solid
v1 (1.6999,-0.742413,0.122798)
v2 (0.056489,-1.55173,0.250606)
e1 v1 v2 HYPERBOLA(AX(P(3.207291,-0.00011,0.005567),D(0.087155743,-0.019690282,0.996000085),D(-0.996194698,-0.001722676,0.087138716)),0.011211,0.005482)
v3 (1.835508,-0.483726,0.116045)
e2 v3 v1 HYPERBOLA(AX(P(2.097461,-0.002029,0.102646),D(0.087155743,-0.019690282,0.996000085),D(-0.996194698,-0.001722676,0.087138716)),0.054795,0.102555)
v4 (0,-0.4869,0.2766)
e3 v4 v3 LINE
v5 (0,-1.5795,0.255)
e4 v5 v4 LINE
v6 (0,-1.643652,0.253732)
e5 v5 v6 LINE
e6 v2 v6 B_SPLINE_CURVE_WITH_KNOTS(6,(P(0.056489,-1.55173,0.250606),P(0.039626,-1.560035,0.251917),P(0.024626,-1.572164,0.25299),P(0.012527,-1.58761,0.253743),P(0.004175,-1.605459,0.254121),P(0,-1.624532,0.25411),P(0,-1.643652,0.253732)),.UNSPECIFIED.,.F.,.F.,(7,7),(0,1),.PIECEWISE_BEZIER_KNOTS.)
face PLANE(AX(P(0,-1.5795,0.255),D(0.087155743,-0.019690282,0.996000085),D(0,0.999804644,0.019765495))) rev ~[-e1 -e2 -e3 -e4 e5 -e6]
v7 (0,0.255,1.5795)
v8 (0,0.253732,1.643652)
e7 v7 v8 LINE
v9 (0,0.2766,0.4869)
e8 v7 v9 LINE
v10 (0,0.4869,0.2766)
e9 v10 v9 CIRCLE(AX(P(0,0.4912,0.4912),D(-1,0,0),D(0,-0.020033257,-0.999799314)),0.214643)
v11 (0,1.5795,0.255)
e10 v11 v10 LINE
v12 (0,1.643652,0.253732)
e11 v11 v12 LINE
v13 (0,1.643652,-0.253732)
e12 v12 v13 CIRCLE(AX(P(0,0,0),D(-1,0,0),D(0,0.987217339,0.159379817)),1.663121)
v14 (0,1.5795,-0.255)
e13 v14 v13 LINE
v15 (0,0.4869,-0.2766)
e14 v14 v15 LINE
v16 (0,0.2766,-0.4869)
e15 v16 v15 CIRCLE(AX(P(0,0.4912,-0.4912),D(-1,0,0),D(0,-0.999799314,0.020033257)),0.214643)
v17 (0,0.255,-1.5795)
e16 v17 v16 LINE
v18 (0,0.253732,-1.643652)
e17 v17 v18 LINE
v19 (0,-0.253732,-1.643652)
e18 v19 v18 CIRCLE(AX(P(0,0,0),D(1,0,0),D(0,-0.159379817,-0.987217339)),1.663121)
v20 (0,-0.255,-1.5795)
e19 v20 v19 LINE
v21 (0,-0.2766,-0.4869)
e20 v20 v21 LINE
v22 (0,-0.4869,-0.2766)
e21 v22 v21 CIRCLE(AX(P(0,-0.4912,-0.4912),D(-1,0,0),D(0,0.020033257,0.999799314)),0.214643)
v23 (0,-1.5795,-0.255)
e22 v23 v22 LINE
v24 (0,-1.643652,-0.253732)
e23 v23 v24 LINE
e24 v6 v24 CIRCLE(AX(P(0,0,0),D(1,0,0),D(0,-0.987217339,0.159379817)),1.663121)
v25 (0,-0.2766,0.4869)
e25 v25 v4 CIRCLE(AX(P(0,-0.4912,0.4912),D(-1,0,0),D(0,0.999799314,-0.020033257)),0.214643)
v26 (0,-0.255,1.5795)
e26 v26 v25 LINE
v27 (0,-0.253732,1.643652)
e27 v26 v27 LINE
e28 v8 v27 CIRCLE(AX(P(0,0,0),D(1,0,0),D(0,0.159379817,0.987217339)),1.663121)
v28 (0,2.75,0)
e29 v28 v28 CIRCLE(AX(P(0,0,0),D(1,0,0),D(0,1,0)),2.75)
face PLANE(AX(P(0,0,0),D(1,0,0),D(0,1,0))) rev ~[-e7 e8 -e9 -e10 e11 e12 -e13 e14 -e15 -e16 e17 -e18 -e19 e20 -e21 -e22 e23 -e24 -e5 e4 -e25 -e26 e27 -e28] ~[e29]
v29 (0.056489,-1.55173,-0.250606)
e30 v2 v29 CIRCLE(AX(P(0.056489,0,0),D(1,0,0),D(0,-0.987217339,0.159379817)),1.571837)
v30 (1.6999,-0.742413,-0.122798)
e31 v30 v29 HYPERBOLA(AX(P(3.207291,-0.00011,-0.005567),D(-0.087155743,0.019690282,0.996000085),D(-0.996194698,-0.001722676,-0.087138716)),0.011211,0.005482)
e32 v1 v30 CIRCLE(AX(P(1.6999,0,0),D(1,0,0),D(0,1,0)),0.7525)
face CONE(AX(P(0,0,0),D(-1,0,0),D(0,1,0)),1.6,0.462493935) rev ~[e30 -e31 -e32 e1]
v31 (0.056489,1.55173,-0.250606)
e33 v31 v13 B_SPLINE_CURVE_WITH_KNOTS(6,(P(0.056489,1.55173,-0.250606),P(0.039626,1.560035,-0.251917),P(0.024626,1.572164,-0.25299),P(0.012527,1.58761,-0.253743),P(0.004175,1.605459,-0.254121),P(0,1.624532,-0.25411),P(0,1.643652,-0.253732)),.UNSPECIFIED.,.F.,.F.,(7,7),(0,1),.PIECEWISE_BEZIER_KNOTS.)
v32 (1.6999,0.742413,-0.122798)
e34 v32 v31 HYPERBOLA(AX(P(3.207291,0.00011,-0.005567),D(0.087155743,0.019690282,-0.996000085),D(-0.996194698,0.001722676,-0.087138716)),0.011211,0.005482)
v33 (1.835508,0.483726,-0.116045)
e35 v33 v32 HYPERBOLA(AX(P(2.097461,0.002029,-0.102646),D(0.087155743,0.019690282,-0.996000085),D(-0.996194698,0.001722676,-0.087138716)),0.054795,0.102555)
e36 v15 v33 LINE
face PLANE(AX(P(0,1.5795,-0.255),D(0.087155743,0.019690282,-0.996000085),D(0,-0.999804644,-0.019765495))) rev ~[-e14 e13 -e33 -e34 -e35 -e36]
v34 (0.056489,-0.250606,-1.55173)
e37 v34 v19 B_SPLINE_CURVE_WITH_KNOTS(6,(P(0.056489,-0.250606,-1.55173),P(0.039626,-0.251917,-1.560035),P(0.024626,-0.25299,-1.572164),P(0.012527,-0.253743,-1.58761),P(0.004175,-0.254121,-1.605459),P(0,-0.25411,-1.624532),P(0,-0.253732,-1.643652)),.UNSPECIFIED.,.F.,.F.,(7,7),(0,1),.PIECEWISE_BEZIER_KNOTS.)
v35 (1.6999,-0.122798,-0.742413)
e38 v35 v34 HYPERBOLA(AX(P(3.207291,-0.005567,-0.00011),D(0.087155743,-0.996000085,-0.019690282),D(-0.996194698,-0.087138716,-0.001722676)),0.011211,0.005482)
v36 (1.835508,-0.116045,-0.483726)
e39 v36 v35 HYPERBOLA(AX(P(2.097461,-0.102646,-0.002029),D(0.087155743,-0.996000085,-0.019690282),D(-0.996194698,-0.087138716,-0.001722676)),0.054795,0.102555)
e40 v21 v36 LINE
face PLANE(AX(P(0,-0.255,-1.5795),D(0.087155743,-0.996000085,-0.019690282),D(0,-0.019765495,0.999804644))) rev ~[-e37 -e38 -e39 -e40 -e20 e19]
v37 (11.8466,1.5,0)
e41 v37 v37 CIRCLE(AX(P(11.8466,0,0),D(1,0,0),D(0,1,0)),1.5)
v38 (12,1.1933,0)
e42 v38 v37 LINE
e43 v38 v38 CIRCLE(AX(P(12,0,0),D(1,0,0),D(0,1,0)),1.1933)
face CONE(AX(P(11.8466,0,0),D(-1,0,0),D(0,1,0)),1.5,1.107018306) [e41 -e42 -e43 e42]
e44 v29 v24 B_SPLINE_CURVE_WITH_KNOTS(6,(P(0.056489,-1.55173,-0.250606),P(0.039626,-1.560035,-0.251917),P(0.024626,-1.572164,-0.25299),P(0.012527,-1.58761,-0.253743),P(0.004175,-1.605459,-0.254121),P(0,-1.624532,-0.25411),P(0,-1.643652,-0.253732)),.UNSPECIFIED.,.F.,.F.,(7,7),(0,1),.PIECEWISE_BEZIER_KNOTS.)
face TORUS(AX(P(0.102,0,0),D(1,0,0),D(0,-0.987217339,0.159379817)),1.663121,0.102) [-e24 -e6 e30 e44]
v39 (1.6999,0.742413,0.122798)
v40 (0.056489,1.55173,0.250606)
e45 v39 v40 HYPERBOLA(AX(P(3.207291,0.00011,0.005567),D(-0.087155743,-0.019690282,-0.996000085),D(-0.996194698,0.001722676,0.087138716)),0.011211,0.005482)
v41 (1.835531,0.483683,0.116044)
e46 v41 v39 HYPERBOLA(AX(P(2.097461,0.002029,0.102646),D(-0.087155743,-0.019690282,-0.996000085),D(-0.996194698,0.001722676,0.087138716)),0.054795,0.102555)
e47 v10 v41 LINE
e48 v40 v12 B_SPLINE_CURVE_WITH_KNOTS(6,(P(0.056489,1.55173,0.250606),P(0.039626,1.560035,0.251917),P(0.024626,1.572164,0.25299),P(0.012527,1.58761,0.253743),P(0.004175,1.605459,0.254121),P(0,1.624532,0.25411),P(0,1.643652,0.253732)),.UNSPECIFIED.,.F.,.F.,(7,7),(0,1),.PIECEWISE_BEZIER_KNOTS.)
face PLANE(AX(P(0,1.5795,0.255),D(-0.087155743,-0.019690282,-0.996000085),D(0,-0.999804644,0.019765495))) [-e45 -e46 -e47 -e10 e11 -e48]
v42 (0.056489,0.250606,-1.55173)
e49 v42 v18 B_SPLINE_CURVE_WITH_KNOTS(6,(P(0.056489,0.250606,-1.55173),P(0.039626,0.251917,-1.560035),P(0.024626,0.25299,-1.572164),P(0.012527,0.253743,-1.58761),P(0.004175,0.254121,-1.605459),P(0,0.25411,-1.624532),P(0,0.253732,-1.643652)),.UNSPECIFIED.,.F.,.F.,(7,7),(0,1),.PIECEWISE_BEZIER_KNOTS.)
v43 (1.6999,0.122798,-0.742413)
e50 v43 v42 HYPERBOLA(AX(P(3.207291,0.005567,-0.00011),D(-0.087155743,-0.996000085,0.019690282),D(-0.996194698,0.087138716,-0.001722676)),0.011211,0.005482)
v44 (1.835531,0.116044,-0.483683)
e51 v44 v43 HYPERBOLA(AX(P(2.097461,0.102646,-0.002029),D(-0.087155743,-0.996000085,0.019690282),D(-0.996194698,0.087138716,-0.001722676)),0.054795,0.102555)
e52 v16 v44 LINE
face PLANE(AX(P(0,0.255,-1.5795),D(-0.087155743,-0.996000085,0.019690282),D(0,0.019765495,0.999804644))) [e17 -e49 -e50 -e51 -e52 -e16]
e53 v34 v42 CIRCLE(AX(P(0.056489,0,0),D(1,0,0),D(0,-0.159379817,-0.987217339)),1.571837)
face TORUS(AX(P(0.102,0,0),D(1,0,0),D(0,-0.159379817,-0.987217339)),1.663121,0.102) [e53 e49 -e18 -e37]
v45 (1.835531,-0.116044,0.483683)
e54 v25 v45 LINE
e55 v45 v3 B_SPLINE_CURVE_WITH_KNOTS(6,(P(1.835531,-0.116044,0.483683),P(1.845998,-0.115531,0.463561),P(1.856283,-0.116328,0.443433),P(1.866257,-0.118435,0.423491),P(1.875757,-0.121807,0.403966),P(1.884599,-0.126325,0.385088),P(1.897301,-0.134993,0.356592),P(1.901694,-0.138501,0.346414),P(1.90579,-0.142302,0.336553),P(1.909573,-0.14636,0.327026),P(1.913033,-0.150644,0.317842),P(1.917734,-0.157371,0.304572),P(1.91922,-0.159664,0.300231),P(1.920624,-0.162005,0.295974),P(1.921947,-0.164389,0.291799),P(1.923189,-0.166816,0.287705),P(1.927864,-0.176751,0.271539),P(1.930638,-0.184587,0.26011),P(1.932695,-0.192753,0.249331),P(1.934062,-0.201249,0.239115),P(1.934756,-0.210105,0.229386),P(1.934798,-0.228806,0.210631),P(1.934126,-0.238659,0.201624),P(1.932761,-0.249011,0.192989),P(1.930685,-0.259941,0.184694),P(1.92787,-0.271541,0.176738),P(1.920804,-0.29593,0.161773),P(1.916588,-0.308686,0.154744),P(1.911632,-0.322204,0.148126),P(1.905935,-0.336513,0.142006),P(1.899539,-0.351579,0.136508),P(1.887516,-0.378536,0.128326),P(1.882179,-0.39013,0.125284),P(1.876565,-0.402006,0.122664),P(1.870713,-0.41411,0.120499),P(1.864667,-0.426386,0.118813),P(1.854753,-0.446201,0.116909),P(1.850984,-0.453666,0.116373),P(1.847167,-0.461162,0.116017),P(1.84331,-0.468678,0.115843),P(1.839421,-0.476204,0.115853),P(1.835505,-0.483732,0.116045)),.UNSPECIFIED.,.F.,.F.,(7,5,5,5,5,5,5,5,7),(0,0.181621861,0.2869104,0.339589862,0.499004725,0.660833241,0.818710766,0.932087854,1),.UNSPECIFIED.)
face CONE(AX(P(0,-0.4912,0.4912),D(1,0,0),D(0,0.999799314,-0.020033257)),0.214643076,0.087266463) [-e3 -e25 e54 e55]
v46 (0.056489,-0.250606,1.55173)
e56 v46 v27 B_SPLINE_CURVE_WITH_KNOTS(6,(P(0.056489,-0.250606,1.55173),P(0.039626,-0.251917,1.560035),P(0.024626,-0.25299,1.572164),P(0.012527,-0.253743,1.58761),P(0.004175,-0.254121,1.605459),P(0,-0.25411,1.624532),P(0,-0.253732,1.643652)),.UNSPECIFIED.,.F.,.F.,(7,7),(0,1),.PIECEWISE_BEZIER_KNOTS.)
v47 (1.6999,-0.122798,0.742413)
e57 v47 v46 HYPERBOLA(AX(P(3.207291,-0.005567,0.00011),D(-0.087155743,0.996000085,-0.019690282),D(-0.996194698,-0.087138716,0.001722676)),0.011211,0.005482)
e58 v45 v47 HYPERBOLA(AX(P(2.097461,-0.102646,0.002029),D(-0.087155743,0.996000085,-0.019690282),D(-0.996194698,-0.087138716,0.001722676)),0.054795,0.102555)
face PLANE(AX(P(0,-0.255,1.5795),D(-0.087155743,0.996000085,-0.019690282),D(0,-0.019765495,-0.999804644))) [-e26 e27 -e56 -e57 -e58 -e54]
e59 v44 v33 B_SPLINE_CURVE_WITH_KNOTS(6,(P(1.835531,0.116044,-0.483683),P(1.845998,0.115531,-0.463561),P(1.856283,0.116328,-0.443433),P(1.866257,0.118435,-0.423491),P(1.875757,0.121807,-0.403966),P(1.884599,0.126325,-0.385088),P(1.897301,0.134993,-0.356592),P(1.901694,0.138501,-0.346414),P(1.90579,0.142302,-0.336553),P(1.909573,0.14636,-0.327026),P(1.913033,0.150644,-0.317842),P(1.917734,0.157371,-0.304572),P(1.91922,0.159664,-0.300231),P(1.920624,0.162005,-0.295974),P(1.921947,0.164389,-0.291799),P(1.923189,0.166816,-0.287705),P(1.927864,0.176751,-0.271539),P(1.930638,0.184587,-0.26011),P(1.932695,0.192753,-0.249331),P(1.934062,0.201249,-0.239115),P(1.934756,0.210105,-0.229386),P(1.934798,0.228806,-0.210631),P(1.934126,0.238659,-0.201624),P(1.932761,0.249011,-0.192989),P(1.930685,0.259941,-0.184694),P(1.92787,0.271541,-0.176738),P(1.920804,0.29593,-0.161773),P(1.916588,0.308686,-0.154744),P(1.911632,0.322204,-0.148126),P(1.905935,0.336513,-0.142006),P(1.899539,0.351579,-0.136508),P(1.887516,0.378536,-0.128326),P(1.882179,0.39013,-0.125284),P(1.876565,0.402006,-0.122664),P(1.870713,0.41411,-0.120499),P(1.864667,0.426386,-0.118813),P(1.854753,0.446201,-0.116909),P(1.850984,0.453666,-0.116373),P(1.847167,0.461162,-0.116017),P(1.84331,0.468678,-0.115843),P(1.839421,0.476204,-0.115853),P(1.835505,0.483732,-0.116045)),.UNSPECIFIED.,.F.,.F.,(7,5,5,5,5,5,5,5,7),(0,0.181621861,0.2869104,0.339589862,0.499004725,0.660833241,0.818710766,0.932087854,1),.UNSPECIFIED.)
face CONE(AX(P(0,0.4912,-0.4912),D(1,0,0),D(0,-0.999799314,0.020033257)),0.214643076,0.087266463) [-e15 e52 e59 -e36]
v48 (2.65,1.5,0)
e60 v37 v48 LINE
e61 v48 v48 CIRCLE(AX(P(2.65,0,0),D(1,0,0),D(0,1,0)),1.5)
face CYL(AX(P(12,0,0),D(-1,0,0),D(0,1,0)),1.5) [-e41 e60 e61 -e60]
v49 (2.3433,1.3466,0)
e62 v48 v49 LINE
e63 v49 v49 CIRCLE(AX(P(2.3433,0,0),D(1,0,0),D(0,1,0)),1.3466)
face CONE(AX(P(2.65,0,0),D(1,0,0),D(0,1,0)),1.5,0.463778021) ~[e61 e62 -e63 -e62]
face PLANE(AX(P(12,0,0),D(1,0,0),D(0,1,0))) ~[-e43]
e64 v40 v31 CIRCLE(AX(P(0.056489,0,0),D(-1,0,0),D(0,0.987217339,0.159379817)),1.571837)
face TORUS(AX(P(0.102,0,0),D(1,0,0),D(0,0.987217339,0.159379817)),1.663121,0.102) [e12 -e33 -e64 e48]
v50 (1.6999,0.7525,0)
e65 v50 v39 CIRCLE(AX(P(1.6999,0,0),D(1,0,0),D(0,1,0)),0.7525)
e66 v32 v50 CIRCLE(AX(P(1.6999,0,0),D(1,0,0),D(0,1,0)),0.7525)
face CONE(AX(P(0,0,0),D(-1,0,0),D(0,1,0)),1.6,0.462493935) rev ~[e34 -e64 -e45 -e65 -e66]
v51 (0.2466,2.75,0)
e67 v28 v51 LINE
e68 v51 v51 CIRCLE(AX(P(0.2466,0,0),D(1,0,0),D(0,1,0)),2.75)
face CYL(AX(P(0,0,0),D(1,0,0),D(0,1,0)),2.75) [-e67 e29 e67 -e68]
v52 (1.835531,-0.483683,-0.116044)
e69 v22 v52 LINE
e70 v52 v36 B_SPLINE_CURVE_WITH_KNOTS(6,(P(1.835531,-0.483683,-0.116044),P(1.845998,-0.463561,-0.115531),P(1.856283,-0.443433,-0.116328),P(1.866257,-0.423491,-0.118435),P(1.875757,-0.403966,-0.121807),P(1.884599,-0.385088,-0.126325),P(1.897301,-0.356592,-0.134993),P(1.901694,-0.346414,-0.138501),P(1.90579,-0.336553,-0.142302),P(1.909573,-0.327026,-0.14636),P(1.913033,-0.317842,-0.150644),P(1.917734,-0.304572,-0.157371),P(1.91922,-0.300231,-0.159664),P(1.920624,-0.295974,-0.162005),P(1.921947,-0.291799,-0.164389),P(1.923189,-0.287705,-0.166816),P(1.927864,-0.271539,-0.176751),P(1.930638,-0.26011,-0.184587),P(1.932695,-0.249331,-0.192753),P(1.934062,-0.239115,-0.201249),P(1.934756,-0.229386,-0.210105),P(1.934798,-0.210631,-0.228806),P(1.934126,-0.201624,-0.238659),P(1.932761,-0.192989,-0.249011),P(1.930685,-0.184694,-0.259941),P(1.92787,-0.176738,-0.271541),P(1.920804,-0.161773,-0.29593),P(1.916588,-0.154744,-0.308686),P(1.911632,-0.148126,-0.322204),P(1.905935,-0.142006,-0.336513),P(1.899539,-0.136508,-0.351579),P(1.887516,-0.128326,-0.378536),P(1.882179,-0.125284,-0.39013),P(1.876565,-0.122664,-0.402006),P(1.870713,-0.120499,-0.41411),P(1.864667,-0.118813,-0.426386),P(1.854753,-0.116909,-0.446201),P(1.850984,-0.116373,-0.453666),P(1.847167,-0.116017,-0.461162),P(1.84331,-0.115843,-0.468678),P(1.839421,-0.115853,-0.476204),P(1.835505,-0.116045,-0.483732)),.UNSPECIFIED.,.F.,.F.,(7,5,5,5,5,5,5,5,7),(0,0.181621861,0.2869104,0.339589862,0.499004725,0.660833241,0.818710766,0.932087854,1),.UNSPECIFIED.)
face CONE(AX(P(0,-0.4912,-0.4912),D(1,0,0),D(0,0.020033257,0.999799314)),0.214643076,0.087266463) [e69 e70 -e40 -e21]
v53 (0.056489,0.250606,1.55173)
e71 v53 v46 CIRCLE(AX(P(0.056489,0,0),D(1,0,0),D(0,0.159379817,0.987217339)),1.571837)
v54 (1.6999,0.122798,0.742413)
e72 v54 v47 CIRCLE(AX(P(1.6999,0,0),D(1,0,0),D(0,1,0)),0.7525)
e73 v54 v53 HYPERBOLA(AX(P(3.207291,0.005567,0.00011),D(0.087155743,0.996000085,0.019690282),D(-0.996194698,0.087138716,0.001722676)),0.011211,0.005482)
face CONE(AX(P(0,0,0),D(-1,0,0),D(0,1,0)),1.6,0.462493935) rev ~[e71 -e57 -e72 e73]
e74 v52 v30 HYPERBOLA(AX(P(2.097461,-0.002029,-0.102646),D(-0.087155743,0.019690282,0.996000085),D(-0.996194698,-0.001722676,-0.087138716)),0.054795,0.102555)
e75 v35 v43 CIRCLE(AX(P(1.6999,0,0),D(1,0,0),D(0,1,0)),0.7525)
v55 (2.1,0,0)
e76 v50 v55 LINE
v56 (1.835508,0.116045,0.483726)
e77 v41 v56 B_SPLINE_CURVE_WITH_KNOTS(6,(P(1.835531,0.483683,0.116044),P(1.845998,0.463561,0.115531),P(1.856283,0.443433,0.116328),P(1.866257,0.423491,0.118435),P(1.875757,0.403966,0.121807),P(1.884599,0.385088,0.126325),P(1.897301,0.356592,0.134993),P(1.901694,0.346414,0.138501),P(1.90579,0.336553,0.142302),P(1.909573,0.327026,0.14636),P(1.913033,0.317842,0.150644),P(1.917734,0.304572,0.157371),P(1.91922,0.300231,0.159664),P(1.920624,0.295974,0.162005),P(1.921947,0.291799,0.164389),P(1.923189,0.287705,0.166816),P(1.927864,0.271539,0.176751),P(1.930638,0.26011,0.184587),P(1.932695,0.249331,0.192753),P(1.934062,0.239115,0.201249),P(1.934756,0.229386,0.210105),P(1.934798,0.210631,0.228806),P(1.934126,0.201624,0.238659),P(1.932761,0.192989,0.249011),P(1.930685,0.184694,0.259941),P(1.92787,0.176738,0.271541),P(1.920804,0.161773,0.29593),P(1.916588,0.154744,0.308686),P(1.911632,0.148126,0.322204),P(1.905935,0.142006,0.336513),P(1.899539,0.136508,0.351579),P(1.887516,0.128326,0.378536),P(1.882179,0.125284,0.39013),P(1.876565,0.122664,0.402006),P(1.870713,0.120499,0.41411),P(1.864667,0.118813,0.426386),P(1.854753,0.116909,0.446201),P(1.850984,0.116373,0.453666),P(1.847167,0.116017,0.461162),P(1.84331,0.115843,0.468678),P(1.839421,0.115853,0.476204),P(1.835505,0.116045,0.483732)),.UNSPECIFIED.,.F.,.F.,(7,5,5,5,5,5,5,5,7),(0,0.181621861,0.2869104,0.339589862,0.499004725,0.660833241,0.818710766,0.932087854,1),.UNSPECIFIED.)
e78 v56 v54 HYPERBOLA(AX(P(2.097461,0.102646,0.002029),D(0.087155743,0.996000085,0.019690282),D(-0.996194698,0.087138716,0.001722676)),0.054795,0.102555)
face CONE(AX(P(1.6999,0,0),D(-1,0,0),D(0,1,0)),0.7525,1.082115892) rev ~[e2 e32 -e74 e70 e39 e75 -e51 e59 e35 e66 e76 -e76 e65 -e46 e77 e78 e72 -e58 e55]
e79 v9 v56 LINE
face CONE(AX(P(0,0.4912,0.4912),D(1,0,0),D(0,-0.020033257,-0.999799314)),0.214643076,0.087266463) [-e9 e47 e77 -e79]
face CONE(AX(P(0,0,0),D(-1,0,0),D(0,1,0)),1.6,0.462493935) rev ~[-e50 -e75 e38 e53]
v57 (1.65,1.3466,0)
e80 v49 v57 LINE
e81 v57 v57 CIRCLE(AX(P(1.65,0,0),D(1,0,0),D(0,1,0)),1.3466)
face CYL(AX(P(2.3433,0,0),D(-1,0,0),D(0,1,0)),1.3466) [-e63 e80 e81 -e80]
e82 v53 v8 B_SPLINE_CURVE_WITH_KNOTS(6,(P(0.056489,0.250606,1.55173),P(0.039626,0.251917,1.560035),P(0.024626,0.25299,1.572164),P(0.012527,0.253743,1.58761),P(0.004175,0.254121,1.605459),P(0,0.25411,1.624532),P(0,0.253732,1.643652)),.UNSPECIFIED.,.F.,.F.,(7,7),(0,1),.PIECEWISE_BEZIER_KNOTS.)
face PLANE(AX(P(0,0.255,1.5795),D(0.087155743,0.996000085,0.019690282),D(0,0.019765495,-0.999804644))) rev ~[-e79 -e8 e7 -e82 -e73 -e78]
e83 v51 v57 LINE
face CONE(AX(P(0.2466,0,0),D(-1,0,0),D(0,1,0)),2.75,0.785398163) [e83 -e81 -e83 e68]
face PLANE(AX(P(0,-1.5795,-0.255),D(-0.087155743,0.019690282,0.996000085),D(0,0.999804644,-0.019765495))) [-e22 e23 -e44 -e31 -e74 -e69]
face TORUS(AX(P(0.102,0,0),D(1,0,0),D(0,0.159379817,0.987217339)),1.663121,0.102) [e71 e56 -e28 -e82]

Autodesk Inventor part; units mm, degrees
ref_plane "YZ Plane" through (0, 0, 0) normal (1, 0, 0) x (0, 1, 0)
ref_plane "XZ Plane" through (0, 0, 0) normal (0, 1, 0) x (-1, 0, 0)
sketch "Sketch1" plane through (0, 0, 0) normal (0, 0, 1) x (1, 0, 0)
  line L0 (2.1, 0) -> (12, 0)
  line L1 (12, 0) -> (12, 1.5)
  line L2 (12, 1.5) -> (2.65, 1.5)
  line L3 (2.65, 1.5) -> (2.3433, 1.3466)
  line L4 (2.3433, 1.3466) -> (1.65, 1.3466)
  line L5 (0, 2.75) -> (0, 1.6)
  line L6 (0, 1.6) -> (1.6999, 0.7525)
  line L7 (1.6999, 0.7525) -> (2.1, 0)
  line L8 (-2.4, 0) -> (14.4, 0) projected
  line L9 (0, -0.55) -> (0, 3.3) projected
  line L10 (0, 2.75) -> (0.2466, 2.75)
  line L11 (0.2466, 2.75) -> (1.65, 1.3466)
  line L12 (2.65, 1.5) -> (1.4966, 1.5) construction
  dimension "d1" = 9.35
  dimension "d2" = 3
  dimension "d3" = 2.6933
  dimension "d4" = 3.2
  dimension "d5" = 26.5
  dimension "d6" = 62
  dimension "d7" = 2.1
  dimension "d8" = 0.3067
  dimension "d12" = 5.5
  dimension "d13" = 45
  dimension "d15" = 12
  dimension "d24" = 1.65
revolve "Body" add sketch "Sketch1" angle 360 about axis through (2.1, 0, 0) along (1, 0, 0) contours L7 L6 L5 L10 L11 L4 L3 L2 L1 L0
sketch "Sketch2" plane through (0, 0, 0) normal (-1, 0, 0) x (0, 0, 1)
  line L0 (0, 1.6) -> (0, 0) construction
  line L1 (0, 0) -> (1.6, 0) construction
  arc A0 (0.48, 0) -> (0, 0.48) centre (0, 0) ccw construction
  arc A1 (0.56, 0) -> (0, 0.56) centre (0, 0) ccw construction
  arc A2 (1.5795, 0.255) -> (0.255, 1.5795) centre (0, 0) ccw
  line L2 (0, 0) -> (1.1314, 1.1314) construction
  line L3 (0.255, 1.5795) -> (0.2766, 0.4869)
  line L4 (1.5795, 0.255) -> (0.4869, 0.2766)
  arc A3 (0.255, 1.5795) -> (0, 1.6) centre (0, 0) ccw
  arc A4 (1.6, 0) -> (1.5795, 0.255) centre (0, 0) ccw
  line L5 (0, -3.85) -> (0, 3.85) projected
  line L6 (-3.85, 0) -> (3.85, 0) projected
  arc A5 (0.255, -1.5795) -> (1.5795, -0.255) centre (0, 0) ccw
  line L7 (0.255, -1.5795) -> (0.2766, -0.4869)
  line L8 (1.5795, -0.255) -> (0.4869, -0.2766)
  arc A6 (0, -1.6) -> (0.255, -1.5795) centre (0, 0) ccw
  arc A7 (1.5795, -0.255) -> (1.6, 0) centre (0, 0) ccw
  arc A8 (-0.255, 1.5795) -> (-1.5795, 0.255) centre (0, 0) ccw
  line L9 (-0.255, 1.5795) -> (-0.2766, 0.4869)
  line L10 (-1.5795, 0.255) -> (-0.4869, 0.2766)
  arc A9 (0, 1.6) -> (-0.255, 1.5795) centre (0, 0) ccw
  arc A10 (-1.5795, 0.255) -> (-1.6, 0) centre (0, 0) ccw
  arc A11 (-0.255, -1.5795) -> (0, -1.6) centre (0, 0) ccw
  arc A12 (-1.5795, -0.255) -> (-0.255, -1.5795) centre (0, 0) ccw
  arc A13 (-1.6, 0) -> (-1.5795, -0.255) centre (0, 0) ccw
  line L11 (-1.5795, -0.255) -> (-0.4869, -0.2766)
  line L12 (-0.255, -1.5795) -> (-0.2766, -0.4869)
  arc A14 (0.2766, 0.4869) -> (0.4869, 0.2766) centre (0.4912, 0.4912) ccw
  arc A15 (0.4869, -0.2766) -> (0.2766, -0.4869) centre (0.4912, -0.4912) ccw
  arc A16 (-0.4869, 0.2766) -> (-0.2766, 0.4869) centre (-0.4912, 0.4912) ccw
  arc A17 (-0.2766, -0.4869) -> (-0.4869, -0.2766) centre (-0.4912, -0.4912) ccw
  point P0 (1.1314, -1.1314)
  point P1 (-1.1314, 1.1314)
  point P2 (-1.1314, -1.1314)
  dimension "d17" = 0.96
  dimension "d18" = 1.12
  dimension "d19" = 3.2
  dimension "d20" = 45
  dimension "d21" = 0.255
extrude "Slot" add sketch "Sketch2" against normal up to next draft 5 contours L4 A14 L3 A2 | A5 L7 A15 L8 | L9 A16 L10 A8 | A12 L11 A17 L12
fillet "Fillet1" radius 0.102 4 edges at (0, 1.6, 0) (0, 0, -1.6) (0, -1.6, 0) (0, 0, 1.6)
thread "Thread" size "M3x0.5" class "6g" standard "ISO Metric profile" length 9.35
chamfer "Chamfer1" distance 0.3067 distance2 0.1534 1 edges at (12, -1.5, 0) measured on face at (12, 0.263, 0.1197)
ref_plane "Work Plane2" through (3.35, 0, 0) normal (0, 0, -1) x (1, 0, 0)
equation "\"d1\" = GEL"
equation "\"d2\" = GD"
equation "\"d3\" = BDM"
equation "\"d4\" = SDM"
equation "\"d7\" = INTI"
equation "\"d8\" = GAL"
equation "\"d12\" = KOD"
equation "\"d13\" = 0.5 * SEWI"
equation "\"d15\" = NLG"
equation "\"d24\" = KOH"
equation "\"d17\" = 0.3 * SDM"
equation "\"d18\" = 0.35 * SDM"
equation "\"d19\" = SDM"
equation "\"d21\" = 0.5 * SBR"
equation "\"d23\" = 0.2 * SBR"
equation "\"d10\" = GEL"
equation "\"d25\" = -0.5 * SPD + 0.5 * GD"
equation "\"d26\" = 0.5 * GAL"
equation "\"NLG\" = 12"
equation "\"GEL\" = 9.35"
equation "\"GAL\" = 0.61345 * PTC"
equation "\"SPD\" = NND - 1.2269 * PTC"
equation "\"KOD\" = 5.5"
equation "\"KOH\" = 1.65"
equation "\"SBR\" = 0.51"
equation "\"INTI\" = 2.1"
equation "\"SDM\" = 3.2"
equation "\"GD\" = NND"
equation "\"BDM\" = NND - GAL"
equation "\"SEWI\" = 90deg"
equation "\"d9\" = SDM"
equation "\"GUL\" = 0.61345 * PTC"
equation "\"TOA\" = 30deg"
equation "\"EPV\" = 3.15"
equation "\"THREADDIA\" = 3"
equation "\"PTC\" = 0.5"
equation "\"NND\" = 3"
equation "\"GD1\" = THREADDIA - 1.2269 * PTC"
properties part number "ISO 7046-1 - M3 x 12 - 4.8 - H" material "Steel"
